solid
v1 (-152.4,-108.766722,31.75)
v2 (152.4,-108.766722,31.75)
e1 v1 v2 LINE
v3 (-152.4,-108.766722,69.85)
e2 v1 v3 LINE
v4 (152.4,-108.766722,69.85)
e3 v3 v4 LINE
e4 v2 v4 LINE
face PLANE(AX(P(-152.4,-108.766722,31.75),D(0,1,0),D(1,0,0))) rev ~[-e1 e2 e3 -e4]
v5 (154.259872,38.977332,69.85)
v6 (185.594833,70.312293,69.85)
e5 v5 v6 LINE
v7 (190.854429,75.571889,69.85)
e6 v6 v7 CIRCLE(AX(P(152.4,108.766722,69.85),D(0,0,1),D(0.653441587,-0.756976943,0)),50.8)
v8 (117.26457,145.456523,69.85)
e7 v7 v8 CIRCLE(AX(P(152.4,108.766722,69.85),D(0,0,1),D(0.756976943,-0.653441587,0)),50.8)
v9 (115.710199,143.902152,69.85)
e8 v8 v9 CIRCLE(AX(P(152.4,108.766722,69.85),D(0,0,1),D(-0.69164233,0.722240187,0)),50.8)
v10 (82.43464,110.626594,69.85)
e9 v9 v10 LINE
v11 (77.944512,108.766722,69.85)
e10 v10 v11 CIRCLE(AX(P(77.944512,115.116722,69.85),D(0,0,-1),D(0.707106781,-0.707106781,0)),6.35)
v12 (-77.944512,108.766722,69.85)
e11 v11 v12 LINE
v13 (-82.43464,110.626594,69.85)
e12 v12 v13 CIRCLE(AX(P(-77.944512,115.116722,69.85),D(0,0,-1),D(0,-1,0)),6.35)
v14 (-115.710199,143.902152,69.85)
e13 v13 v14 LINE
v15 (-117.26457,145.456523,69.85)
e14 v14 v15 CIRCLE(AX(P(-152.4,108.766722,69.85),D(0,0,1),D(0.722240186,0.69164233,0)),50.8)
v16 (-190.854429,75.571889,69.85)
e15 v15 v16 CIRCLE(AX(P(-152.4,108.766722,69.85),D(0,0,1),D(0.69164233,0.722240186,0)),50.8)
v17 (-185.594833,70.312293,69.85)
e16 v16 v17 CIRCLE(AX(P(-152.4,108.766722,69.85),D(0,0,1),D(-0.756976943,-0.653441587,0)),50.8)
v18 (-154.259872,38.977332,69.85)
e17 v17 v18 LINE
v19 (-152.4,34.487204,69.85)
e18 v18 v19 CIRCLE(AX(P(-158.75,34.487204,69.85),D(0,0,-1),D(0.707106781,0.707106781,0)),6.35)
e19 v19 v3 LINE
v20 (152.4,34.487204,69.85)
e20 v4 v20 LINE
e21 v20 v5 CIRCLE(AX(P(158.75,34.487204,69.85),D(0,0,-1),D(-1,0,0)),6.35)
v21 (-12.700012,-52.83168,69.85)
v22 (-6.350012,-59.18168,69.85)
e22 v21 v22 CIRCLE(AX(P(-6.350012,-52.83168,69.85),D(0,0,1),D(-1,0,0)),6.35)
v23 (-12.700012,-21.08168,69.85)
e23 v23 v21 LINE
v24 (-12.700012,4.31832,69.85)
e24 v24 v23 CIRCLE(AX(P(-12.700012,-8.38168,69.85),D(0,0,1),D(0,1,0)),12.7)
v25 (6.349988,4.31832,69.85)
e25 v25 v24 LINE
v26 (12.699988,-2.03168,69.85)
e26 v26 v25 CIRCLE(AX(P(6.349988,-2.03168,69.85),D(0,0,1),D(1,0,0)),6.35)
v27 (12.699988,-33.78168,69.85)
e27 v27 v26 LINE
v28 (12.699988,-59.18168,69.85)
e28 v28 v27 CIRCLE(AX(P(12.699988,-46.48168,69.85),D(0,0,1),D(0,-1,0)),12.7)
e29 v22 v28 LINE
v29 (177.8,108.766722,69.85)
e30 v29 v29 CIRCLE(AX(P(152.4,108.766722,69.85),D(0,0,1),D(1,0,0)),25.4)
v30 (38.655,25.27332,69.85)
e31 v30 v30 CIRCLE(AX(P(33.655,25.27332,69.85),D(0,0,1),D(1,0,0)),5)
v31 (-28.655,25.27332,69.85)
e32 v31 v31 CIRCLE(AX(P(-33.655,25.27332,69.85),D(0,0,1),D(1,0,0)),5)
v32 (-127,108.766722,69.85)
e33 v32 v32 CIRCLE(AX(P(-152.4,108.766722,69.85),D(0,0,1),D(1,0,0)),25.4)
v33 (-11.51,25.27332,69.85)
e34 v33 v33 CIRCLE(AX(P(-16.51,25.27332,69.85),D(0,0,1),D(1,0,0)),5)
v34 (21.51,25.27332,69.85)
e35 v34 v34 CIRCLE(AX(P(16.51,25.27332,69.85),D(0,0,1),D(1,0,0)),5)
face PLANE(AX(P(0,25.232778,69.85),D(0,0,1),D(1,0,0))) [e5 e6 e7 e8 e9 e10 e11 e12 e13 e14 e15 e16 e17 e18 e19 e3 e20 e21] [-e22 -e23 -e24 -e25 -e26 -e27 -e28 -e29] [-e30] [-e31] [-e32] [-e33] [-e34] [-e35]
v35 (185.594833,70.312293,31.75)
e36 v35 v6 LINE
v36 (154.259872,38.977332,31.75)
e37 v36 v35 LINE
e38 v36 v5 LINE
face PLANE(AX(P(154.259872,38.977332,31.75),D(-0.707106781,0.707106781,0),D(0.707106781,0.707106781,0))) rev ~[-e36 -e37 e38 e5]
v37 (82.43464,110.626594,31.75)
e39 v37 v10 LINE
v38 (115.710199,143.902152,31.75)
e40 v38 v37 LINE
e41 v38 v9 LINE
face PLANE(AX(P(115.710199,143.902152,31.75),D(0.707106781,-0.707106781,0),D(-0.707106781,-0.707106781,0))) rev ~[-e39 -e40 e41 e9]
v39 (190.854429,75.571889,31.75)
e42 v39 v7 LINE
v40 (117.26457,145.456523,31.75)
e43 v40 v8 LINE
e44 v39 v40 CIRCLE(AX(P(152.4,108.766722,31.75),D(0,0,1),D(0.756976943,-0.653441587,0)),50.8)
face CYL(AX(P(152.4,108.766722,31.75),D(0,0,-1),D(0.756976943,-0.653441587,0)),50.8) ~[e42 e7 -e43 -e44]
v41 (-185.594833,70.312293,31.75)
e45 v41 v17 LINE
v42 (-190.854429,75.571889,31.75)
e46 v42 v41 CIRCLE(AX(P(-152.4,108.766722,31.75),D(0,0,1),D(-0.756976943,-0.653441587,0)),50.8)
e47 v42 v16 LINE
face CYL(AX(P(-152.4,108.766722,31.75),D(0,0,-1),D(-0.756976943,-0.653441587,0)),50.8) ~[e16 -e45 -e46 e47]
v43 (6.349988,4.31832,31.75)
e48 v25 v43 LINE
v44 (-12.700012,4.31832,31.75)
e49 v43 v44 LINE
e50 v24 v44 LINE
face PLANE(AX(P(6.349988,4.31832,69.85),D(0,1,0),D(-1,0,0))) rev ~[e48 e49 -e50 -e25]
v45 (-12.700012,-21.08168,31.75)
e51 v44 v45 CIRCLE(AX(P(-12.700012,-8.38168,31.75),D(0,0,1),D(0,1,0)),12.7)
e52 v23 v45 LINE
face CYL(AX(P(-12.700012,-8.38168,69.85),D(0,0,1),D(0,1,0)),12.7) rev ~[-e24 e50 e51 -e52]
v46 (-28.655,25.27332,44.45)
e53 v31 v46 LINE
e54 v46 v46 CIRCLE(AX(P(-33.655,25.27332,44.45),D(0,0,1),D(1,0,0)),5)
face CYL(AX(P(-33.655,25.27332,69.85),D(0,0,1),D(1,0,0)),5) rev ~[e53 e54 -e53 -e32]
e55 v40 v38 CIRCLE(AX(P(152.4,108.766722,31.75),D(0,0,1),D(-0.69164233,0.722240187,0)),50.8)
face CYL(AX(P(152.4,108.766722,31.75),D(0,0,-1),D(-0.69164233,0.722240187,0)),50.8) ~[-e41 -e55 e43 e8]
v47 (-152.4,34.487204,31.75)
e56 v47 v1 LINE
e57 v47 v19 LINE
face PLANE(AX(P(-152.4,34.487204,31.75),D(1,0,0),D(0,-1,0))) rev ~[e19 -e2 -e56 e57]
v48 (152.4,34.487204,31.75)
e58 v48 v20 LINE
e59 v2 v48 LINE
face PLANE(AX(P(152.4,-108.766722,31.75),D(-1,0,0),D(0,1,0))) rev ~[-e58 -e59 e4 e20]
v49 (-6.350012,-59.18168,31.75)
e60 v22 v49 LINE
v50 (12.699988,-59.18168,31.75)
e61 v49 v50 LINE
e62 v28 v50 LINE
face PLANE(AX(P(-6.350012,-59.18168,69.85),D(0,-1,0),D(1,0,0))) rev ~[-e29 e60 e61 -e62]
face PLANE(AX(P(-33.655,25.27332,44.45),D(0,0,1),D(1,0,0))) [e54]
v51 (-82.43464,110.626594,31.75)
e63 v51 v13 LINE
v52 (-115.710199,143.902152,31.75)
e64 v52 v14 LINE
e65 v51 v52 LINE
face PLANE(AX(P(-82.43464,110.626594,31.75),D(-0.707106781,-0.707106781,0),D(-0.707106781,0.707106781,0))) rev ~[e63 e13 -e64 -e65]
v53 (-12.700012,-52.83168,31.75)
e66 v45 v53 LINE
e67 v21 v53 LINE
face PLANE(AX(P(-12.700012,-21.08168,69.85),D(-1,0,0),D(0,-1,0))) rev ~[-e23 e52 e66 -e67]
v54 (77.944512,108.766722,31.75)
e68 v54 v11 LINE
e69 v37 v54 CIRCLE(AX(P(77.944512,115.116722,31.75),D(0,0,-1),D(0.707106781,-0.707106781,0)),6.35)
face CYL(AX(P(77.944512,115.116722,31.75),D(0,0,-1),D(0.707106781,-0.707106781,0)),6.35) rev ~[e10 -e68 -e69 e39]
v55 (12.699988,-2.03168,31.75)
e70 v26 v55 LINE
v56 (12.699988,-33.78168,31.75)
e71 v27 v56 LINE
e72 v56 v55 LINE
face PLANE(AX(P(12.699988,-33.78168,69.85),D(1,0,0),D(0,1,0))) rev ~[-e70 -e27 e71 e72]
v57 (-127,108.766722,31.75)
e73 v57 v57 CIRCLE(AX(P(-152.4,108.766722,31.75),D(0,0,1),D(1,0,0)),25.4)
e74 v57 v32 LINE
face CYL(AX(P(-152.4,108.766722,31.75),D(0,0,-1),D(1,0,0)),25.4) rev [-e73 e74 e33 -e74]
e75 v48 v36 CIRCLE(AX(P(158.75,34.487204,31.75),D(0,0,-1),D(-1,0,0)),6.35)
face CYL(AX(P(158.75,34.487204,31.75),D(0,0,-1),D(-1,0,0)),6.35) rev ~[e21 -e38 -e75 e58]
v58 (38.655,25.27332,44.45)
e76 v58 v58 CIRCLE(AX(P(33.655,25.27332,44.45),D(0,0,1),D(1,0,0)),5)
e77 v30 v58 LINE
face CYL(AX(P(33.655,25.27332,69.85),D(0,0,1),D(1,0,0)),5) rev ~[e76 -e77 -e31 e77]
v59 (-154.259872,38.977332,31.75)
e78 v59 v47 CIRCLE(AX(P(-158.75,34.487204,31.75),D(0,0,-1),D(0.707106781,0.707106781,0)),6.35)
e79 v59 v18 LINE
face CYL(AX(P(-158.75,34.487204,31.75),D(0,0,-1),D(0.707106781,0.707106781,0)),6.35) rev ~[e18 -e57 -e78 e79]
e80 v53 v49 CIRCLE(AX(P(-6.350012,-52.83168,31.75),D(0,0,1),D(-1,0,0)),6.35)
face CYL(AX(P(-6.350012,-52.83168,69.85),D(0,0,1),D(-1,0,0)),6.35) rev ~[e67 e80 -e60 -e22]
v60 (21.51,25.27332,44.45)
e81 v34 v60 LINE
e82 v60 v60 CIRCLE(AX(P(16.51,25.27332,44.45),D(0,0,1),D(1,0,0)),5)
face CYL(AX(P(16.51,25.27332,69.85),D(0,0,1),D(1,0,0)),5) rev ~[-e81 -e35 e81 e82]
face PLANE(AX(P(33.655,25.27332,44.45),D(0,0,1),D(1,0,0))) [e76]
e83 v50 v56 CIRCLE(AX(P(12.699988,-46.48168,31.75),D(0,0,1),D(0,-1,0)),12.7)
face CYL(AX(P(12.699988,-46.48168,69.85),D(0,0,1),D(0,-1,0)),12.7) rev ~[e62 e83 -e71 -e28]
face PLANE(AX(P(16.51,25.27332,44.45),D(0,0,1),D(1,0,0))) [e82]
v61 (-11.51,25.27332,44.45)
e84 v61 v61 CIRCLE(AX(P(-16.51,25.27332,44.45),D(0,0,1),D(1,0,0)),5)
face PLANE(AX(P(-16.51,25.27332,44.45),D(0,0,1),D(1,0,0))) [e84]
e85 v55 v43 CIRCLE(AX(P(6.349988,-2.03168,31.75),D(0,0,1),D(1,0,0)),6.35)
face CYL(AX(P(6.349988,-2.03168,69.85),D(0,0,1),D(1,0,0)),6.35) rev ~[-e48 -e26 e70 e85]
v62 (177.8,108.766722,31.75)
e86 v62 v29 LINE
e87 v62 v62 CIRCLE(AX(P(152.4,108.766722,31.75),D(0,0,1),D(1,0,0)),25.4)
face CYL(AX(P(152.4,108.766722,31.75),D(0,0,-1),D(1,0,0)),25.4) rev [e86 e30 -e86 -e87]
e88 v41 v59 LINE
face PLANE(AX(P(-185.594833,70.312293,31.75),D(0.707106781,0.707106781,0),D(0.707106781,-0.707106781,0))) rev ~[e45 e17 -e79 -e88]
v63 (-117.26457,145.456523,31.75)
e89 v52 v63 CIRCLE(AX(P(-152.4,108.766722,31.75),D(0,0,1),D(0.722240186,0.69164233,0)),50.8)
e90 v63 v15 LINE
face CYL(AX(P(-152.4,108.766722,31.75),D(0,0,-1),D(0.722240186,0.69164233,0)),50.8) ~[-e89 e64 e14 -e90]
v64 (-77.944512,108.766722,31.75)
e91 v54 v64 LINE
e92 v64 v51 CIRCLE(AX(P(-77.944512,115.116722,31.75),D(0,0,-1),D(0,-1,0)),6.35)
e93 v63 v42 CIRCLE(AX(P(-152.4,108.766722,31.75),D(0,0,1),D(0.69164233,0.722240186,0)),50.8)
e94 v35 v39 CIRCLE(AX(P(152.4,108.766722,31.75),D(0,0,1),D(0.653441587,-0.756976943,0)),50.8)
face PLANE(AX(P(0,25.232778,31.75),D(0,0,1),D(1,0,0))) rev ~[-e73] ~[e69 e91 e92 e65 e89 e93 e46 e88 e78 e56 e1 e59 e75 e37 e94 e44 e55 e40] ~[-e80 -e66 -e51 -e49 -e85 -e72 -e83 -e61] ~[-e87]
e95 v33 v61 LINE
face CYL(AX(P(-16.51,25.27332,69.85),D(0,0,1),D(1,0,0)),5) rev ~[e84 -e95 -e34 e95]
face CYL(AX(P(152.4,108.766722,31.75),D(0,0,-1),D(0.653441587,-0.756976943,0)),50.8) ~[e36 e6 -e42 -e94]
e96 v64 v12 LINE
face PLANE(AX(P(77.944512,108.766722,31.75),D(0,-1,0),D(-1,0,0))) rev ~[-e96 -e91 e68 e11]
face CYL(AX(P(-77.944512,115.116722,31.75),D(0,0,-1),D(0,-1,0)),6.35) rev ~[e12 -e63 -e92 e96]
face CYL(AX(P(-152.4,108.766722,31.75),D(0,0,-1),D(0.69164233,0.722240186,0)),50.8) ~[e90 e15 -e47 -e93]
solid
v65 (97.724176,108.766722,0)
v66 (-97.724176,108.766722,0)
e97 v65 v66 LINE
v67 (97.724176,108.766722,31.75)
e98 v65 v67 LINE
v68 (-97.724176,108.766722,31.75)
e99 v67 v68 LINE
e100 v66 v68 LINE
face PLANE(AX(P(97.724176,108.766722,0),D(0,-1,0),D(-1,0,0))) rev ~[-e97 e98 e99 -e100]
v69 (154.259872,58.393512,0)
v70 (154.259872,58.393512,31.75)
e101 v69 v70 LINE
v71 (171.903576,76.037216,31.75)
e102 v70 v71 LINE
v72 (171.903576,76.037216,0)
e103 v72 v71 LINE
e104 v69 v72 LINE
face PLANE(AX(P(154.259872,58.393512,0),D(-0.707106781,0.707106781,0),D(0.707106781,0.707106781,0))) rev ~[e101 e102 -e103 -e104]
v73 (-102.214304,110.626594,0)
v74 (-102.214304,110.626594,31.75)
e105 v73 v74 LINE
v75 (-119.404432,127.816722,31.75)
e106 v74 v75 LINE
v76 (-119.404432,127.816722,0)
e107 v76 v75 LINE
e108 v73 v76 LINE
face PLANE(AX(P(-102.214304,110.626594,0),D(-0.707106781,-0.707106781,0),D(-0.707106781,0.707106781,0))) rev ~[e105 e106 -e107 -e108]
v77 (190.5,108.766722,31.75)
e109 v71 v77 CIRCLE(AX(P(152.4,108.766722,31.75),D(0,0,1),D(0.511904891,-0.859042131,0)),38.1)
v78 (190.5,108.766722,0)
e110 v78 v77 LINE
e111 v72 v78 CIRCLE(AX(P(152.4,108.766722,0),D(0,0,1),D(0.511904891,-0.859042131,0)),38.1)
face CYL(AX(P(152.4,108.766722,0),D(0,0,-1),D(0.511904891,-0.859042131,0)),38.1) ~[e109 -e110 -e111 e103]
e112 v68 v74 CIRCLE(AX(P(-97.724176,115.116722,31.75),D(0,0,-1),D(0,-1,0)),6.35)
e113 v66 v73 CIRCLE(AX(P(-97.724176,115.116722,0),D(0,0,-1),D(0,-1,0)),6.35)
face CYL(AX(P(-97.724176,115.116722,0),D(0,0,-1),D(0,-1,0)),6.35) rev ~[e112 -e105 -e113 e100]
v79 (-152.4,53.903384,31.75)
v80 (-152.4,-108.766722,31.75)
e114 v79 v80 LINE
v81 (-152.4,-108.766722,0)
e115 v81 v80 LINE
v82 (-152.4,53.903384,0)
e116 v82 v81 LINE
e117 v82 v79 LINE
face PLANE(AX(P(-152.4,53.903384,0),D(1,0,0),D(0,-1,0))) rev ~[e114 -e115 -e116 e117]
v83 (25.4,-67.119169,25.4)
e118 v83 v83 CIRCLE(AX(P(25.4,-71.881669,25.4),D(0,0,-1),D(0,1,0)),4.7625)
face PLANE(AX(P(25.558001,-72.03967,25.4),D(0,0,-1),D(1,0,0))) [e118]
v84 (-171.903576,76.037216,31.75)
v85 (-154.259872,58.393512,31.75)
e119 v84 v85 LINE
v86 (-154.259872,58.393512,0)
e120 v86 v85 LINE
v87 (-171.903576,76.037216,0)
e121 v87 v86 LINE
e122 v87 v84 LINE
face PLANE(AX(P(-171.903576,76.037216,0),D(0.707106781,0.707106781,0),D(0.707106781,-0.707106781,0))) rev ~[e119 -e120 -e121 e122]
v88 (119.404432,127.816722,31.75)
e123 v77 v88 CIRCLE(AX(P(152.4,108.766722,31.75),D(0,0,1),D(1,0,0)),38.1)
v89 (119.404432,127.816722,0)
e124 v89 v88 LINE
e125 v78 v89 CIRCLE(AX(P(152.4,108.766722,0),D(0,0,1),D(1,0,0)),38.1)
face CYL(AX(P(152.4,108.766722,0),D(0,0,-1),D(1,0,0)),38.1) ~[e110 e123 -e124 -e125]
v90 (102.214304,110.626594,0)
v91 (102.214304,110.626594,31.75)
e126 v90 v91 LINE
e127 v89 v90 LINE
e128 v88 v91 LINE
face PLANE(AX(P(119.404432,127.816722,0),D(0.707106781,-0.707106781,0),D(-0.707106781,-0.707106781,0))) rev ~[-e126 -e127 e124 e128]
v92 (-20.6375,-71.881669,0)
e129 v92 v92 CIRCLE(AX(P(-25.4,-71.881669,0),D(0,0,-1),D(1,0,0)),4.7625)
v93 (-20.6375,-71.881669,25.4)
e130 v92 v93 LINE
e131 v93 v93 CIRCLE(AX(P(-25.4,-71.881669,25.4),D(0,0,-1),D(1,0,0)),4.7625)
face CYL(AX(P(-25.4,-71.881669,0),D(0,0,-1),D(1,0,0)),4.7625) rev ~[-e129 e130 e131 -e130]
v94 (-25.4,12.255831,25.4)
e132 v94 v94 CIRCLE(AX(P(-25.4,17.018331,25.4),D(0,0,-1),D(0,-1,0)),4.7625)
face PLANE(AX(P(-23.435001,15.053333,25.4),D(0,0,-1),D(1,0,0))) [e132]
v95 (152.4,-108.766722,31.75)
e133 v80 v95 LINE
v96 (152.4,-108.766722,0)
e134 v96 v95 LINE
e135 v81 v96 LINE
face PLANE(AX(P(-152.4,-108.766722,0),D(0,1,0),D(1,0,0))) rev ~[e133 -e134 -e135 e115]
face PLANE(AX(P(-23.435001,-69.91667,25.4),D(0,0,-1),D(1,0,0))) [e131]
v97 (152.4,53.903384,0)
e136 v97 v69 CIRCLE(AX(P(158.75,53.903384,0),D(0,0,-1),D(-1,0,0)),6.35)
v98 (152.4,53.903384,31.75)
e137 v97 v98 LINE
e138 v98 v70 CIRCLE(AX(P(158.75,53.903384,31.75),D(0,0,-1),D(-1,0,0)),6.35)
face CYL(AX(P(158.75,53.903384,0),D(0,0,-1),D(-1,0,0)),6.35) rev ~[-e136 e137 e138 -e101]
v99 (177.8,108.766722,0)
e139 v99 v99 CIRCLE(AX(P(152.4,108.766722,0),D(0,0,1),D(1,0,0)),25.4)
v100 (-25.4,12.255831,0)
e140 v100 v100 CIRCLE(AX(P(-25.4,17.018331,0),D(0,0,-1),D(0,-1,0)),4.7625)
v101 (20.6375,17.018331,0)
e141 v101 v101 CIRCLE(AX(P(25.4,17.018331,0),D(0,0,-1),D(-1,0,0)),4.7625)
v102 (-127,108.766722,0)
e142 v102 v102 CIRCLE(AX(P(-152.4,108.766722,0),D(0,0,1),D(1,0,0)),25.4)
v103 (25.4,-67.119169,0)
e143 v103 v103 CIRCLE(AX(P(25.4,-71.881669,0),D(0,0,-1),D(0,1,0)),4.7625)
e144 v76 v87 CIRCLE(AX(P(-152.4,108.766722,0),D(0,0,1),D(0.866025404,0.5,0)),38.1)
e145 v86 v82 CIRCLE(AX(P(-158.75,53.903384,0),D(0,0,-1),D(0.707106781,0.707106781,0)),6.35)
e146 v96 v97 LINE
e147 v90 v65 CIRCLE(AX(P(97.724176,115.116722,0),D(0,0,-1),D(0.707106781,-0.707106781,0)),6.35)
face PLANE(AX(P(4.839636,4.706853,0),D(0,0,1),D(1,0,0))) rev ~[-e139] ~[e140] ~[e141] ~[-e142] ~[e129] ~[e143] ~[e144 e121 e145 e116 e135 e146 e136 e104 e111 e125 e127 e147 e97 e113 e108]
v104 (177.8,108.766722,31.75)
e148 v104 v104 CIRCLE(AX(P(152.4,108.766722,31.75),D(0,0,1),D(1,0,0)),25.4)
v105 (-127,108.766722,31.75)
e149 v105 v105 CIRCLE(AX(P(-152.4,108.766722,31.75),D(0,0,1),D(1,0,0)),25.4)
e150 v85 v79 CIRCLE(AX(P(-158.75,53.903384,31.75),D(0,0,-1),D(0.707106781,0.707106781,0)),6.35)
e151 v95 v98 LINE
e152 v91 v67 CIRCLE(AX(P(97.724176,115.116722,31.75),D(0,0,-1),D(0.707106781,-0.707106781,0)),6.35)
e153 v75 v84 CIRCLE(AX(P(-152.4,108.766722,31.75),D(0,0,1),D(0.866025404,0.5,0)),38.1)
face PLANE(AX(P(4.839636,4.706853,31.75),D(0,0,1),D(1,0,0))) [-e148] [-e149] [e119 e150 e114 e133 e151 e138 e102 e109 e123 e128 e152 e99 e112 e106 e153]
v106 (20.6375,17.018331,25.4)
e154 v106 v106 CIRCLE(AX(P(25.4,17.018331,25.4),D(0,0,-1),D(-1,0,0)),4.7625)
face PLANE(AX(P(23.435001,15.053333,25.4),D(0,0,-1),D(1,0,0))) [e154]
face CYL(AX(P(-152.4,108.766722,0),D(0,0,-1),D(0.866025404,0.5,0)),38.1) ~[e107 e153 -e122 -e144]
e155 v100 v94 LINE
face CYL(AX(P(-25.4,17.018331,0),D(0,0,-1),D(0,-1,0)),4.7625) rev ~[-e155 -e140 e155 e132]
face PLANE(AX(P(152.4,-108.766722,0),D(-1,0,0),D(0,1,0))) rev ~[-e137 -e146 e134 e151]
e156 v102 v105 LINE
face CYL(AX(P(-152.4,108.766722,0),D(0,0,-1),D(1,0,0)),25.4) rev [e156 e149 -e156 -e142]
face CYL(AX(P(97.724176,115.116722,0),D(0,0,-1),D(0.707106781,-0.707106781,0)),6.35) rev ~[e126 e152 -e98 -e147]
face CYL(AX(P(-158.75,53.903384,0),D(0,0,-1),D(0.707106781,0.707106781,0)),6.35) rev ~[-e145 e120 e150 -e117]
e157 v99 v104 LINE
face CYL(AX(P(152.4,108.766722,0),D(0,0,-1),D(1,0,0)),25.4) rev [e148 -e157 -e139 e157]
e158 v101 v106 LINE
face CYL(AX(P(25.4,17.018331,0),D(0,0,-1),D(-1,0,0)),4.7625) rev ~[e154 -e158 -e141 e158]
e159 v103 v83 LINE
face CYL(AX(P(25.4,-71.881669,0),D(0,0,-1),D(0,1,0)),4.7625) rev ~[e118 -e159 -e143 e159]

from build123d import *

# Parameters (mm, degrees)
F0_R      = 25.4
F1_DEPTH  = 31.75
F4_R      = 25.4
F5_DEPTH  = 38.1
F7_DEPTH  = 25.4
F9_R      = 5
F10_DEPTH = 25.4
F12_DEPTH = 38.1


with BuildPart() as f1:
    # F0 (on Top) → F1 (new body)
    with BuildSketch(Plane.XY):
        with BuildLine():
            Line((-152.4, 53.9033839703), (-152.4, -108.7667216295))
            Line((-152.4, -108.7667216295), (152.4, -108.7667216295))
            Line((152.4, -108.7667216295), (152.4, 53.9033839703))
            ThreePointArc((152.4, 53.9033839703), (152.8833649686, 56.3334237658), (154.2598719395, 58.3935120309))
            Line((154.2598719395, 58.3935120309), (171.9035763614, 76.0372164528))
            ThreePointArc((171.9035763614, 76.0372164528), (125.6457900901, 81.6406778321), (119.4044321158, 127.8167216295))
            Line((119.4044321158, 127.8167216295), (102.2143040553, 110.626593569))
            ThreePointArc((102.2143040553, 110.626593569), (100.1542157903, 109.2500865981), (97.7241759947, 108.7667216295))
            Line((97.7241759947, 108.7667216295), (-97.7241759947, 108.7667216295))
            ThreePointArc((-97.7241759947, 108.7667216295), (-100.1542157903, 109.2500865981), (-102.2143040553, 110.626593569))
            Line((-102.2143040553, 110.626593569), (-119.4044321158, 127.8167216295))
            ThreePointArc((-119.4044321158, 127.8167216295), (-115.5982260184, 118.6277272479), (-114.3, 108.7667216295))
            ThreePointArc((-114.3, 108.7667216295), (-125.4592316368, 81.8259532663), (-152.4, 70.6667216295))
            Line((-152.4, 70.6667216295), (-152.4, 53.9033839703))
        make_face()
        with BuildLine():
            ThreePointArc((-171.9035763614, 76.0372164528), (-162.5147380778, 72.0338742907), (-152.4, 70.6667216295))
            ThreePointArc((-152.4, 70.6667216295), (-125.4592316368, 81.8259532663), (-114.3, 108.7667216295))
            ThreePointArc((-114.3, 108.7667216295), (-115.5982260184, 118.6277272479), (-119.4044321158, 127.8167216295))
            ThreePointArc((-119.4044321158, 127.8167216295), (-179.1542099099, 135.8927654269), (-171.9035763614, 76.0372164528))
        make_face()
        with Locations((-152.4, 108.7667216295)):
            Circle(F0_R, mode=Mode.SUBTRACT)
        with BuildLine():
            ThreePointArc((119.4044321158, 127.8167216295), (125.6457900901, 81.6406778321), (171.9035763614, 76.0372164528))
            ThreePointArc((171.9035763614, 76.0372164528), (185.5262453303, 89.9448760687), (190.5, 108.7667216295))
            ThreePointArc((190.5, 108.7667216295), (162.2610056184, 145.5684956111), (119.4044321158, 127.8167216295))
        make_face()
        with Locations((152.4, 108.7667216295)):
            Circle(F0_R, mode=Mode.SUBTRACT)
        with BuildLine():
            ThreePointArc((-154.2598719395, 58.3935120309), (-152.8833649686, 56.3334237658), (-152.4, 53.9033839703))
            Line((-152.4, 53.9033839703), (-152.4, 70.6667216295))
            ThreePointArc((-152.4, 70.6667216295), (-162.5147380778, 72.0338742907), (-171.9035763614, 76.0372164528))
            Line((-171.9035763614, 76.0372164528), (-154.2598719395, 58.3935120309))
        make_face()
    extrude(amount=F1_DEPTH)


with BuildPart() as f2_1:
    # F2: copy of F1
    add(f1.part)


with BuildPart() as f5:
    # F4 (on face) → F5 (new body)
    with BuildSketch(Plane.XY.offset(31.75)):
        with BuildLine():
            Line((-152.4, -108.7667216295), (152.4, -108.7667216295))
            Line((152.4, -108.7667216295), (152.4, 34.487204177))
            ThreePointArc((152.4, 34.487204177), (152.8833649686, 36.9172439725), (154.2598719395, 38.9773322375))
            Line((154.2598719395, 38.9773322375), (185.5948326386, 70.3122929367))
            Line((185.5948326386, 70.3122929367), (190.8544286929, 75.5718889909))
            ThreePointArc((190.8544286929, 75.5718889909), (187.3817017696, 145.6031240231), (117.2645696221, 145.4565231029))
            Line((117.2645696221, 145.4565231029), (115.7101985266, 143.9021520075))
            Line((115.7101985266, 143.9021520075), (82.4346400881, 110.626593569))
            ThreePointArc((82.4346400881, 110.626593569), (80.3745518231, 109.2500865981), (77.9445120276, 108.7667216295))
            Line((77.9445120276, 108.7667216295), (-77.9445120276, 108.7667216295))
            ThreePointArc((-77.9445120276, 108.7667216295), (-80.3745518231, 109.2500865981), (-82.4346400881, 110.626593569))
            Line((-82.4346400881, 110.626593569), (-115.7101985266, 143.9021520075))
            Line((-115.7101985266, 143.9021520075), (-117.2645696221, 145.4565231029))
            ThreePointArc((-117.2645696221, 145.4565231029), (-187.3817017696, 145.6031240231), (-190.8544286929, 75.5718889909))
            Line((-190.8544286929, 75.5718889909), (-185.5948326386, 70.3122929367))
            Line((-185.5948326386, 70.3122929367), (-154.2598719395, 38.9773322375))
            ThreePointArc((-154.2598719395, 38.9773322375), (-152.8833649686, 36.9172439725), (-152.4, 34.487204177))
            Line((-152.4, 34.487204177), (-152.4, -108.7667216295))
        make_face()
        with Locations((-152.4, 108.7667216295)):
            Circle(F4_R, mode=Mode.SUBTRACT)
        with Locations((152.4, 108.7667216295)):
            Circle(F4_R, mode=Mode.SUBTRACT)
        with BuildLine():
            Line((190.8544286929, 75.5718889909), (185.5948326386, 70.3122929367))
            ThreePointArc((185.5948326386, 70.3122929367), (188.3210244843, 72.8456971453), (190.8544286929, 75.5718889909))
        make_face()
        with BuildLine():
            ThreePointArc((-190.8544286929, 75.5718889909), (-188.3210244843, 72.8456971453), (-185.5948326386, 70.3122929367))
            Line((-185.5948326386, 70.3122929367), (-190.8544286929, 75.5718889909))
        make_face()
        with BuildLine():
            Line((115.7101985266, 143.9021520075), (117.2645696221, 145.4565231029))
            ThreePointArc((117.2645696221, 145.4565231029), (116.4789755157, 144.6877461138), (115.7101985266, 143.9021520075))
        make_face()
        with BuildLine():
            ThreePointArc((-115.7101985266, 143.9021520075), (-116.4789755157, 144.6877461138), (-117.2645696221, 145.4565231029))
            Line((-117.2645696221, 145.4565231029), (-115.7101985266, 143.9021520075))
        make_face()
    extrude(amount=F5_DEPTH)

    # F9 (on face) → F10 (cut)
    with BuildSketch(Plane.XY.offset(69.85)):
        with Locations((-33.655, 25.2733201705)):
            Circle(F9_R)
        with Locations((-16.51, 25.2733201705)):
            Circle(F9_R)
        with Locations((16.51, 25.2733201705)):
            Circle(F9_R)
        with Locations((33.655, 25.2733201705)):
            Circle(F9_R)
    extrude(amount=-F10_DEPTH, mode=Mode.SUBTRACT)

    # F11 (on face) → F12 (cut, through all)
    with BuildSketch(Plane.XY.offset(69.85)):
        with BuildLine():
            ThreePointArc((12.6999875243, -59.1816798295), (25.3999875243, -46.4816798295), (12.6999875243, -33.7816798295))
            Line((12.6999875243, -33.7816798295), (12.6999875243, -2.0316798295))
            ThreePointArc((12.6999875243, -2.0316798295), (10.8401155849, 2.458448231), (6.3499875243, 4.3183201705))
            Line((6.3499875243, 4.3183201705), (-12.7000124757, 4.3183201705))
            ThreePointArc((-12.7000124757, 4.3183201705), (-25.4000124757, -8.3816798295), (-12.7000124757, -21.0816798295))
            Line((-12.7000124757, -21.0816798295), (-12.7000124757, -52.8316798295))
            ThreePointArc((-12.7000124757, -52.8316798295), (-10.8401405362, -57.3218078901), (-6.3500124757, -59.1816798295))
            Line((-6.3500124757, -59.1816798295), (12.6999875243, -59.1816798295))
        make_face()
    extrude(amount=-F12_DEPTH, mode=Mode.SUBTRACT)


with BuildPart() as f1_1:
    add(f1.part)

    # F6 (on face) → F7 (cut)
    with BuildSketch(Plane(origin=(0, 0, 0), x_dir=(1, 0, 0), z_dir=(0, 0, -1))):
        with BuildLine():
            Line((-25.4, 71.8816688296), (-25.4, 67.1191688296))
            ThreePointArc((-25.4, 67.1191688296), (-22.0324039546, 68.5140727842), (-20.6375, 71.8816688296))
            Line((-20.6375, 71.8816688296), (-25.4, 71.8816688296))
        make_face()
        with BuildLine():
            ThreePointArc((-20.6375, 71.8816688296), (-28.7675960454, 75.249264875), (-25.4, 67.1191688296))
            Line((-25.4, 67.1191688296), (-25.4, 71.8816688296))
            Line((-25.4, 71.8816688296), (-20.6375, 71.8816688296))
        make_face()
        with BuildLine():
            Line((25.4, 71.8816688296), (25.4, 67.1191688296))
            ThreePointArc((25.4, 67.1191688296), (28.7675960454, 68.5140727842), (30.1625, 71.8816688296))
            ThreePointArc((30.1625, 71.8816688296), (25.4, 76.6441688296), (20.6375, 71.8816688296))
            Line((20.6375, 71.8816688296), (25.4, 71.8816688296))
        make_face()
        with BuildLine():
            ThreePointArc((20.6375, 71.8816688296), (22.0324039546, 68.5140727842), (25.4, 67.1191688296))
            Line((25.4, 67.1191688296), (25.4, 71.8816688296))
            Line((25.4, 71.8816688296), (20.6375, 71.8816688296))
        make_face()
        with BuildLine():
            ThreePointArc((-20.6375, -17.0183311704), (-22.0324039546, -13.650735125), (-25.4, -12.2558311704))
            Line((-25.4, -12.2558311704), (-25.4, -17.0183311704))
            Line((-25.4, -17.0183311704), (-20.6375, -17.0183311704))
        make_face()
        with BuildLine():
            Line((-25.4, -17.0183311704), (-25.4, -12.2558311704))
            ThreePointArc((-25.4, -12.2558311704), (-28.7675960454, -20.3859272158), (-20.6375, -17.0183311704))
            Line((-20.6375, -17.0183311704), (-25.4, -17.0183311704))
        make_face()
        with BuildLine():
            Line((25.4, -17.0183311704), (25.4, -12.2558311704))
            ThreePointArc((25.4, -12.2558311704), (22.0324039546, -13.650735125), (20.6375, -17.0183311704))
            Line((20.6375, -17.0183311704), (25.4, -17.0183311704))
        make_face()
        with BuildLine():
            ThreePointArc((30.1625, -17.0183311704), (28.7675960454, -13.650735125), (25.4, -12.2558311704))
            Line((25.4, -12.2558311704), (25.4, -17.0183311704))
            Line((25.4, -17.0183311704), (20.6375, -17.0183311704))
            ThreePointArc((20.6375, -17.0183311704), (25.4, -21.7808311704), (30.1625, -17.0183311704))
        make_face()
    extrude(amount=-F7_DEPTH, mode=Mode.SUBTRACT)


solid = Compound([f5.part, f1_1.part])
